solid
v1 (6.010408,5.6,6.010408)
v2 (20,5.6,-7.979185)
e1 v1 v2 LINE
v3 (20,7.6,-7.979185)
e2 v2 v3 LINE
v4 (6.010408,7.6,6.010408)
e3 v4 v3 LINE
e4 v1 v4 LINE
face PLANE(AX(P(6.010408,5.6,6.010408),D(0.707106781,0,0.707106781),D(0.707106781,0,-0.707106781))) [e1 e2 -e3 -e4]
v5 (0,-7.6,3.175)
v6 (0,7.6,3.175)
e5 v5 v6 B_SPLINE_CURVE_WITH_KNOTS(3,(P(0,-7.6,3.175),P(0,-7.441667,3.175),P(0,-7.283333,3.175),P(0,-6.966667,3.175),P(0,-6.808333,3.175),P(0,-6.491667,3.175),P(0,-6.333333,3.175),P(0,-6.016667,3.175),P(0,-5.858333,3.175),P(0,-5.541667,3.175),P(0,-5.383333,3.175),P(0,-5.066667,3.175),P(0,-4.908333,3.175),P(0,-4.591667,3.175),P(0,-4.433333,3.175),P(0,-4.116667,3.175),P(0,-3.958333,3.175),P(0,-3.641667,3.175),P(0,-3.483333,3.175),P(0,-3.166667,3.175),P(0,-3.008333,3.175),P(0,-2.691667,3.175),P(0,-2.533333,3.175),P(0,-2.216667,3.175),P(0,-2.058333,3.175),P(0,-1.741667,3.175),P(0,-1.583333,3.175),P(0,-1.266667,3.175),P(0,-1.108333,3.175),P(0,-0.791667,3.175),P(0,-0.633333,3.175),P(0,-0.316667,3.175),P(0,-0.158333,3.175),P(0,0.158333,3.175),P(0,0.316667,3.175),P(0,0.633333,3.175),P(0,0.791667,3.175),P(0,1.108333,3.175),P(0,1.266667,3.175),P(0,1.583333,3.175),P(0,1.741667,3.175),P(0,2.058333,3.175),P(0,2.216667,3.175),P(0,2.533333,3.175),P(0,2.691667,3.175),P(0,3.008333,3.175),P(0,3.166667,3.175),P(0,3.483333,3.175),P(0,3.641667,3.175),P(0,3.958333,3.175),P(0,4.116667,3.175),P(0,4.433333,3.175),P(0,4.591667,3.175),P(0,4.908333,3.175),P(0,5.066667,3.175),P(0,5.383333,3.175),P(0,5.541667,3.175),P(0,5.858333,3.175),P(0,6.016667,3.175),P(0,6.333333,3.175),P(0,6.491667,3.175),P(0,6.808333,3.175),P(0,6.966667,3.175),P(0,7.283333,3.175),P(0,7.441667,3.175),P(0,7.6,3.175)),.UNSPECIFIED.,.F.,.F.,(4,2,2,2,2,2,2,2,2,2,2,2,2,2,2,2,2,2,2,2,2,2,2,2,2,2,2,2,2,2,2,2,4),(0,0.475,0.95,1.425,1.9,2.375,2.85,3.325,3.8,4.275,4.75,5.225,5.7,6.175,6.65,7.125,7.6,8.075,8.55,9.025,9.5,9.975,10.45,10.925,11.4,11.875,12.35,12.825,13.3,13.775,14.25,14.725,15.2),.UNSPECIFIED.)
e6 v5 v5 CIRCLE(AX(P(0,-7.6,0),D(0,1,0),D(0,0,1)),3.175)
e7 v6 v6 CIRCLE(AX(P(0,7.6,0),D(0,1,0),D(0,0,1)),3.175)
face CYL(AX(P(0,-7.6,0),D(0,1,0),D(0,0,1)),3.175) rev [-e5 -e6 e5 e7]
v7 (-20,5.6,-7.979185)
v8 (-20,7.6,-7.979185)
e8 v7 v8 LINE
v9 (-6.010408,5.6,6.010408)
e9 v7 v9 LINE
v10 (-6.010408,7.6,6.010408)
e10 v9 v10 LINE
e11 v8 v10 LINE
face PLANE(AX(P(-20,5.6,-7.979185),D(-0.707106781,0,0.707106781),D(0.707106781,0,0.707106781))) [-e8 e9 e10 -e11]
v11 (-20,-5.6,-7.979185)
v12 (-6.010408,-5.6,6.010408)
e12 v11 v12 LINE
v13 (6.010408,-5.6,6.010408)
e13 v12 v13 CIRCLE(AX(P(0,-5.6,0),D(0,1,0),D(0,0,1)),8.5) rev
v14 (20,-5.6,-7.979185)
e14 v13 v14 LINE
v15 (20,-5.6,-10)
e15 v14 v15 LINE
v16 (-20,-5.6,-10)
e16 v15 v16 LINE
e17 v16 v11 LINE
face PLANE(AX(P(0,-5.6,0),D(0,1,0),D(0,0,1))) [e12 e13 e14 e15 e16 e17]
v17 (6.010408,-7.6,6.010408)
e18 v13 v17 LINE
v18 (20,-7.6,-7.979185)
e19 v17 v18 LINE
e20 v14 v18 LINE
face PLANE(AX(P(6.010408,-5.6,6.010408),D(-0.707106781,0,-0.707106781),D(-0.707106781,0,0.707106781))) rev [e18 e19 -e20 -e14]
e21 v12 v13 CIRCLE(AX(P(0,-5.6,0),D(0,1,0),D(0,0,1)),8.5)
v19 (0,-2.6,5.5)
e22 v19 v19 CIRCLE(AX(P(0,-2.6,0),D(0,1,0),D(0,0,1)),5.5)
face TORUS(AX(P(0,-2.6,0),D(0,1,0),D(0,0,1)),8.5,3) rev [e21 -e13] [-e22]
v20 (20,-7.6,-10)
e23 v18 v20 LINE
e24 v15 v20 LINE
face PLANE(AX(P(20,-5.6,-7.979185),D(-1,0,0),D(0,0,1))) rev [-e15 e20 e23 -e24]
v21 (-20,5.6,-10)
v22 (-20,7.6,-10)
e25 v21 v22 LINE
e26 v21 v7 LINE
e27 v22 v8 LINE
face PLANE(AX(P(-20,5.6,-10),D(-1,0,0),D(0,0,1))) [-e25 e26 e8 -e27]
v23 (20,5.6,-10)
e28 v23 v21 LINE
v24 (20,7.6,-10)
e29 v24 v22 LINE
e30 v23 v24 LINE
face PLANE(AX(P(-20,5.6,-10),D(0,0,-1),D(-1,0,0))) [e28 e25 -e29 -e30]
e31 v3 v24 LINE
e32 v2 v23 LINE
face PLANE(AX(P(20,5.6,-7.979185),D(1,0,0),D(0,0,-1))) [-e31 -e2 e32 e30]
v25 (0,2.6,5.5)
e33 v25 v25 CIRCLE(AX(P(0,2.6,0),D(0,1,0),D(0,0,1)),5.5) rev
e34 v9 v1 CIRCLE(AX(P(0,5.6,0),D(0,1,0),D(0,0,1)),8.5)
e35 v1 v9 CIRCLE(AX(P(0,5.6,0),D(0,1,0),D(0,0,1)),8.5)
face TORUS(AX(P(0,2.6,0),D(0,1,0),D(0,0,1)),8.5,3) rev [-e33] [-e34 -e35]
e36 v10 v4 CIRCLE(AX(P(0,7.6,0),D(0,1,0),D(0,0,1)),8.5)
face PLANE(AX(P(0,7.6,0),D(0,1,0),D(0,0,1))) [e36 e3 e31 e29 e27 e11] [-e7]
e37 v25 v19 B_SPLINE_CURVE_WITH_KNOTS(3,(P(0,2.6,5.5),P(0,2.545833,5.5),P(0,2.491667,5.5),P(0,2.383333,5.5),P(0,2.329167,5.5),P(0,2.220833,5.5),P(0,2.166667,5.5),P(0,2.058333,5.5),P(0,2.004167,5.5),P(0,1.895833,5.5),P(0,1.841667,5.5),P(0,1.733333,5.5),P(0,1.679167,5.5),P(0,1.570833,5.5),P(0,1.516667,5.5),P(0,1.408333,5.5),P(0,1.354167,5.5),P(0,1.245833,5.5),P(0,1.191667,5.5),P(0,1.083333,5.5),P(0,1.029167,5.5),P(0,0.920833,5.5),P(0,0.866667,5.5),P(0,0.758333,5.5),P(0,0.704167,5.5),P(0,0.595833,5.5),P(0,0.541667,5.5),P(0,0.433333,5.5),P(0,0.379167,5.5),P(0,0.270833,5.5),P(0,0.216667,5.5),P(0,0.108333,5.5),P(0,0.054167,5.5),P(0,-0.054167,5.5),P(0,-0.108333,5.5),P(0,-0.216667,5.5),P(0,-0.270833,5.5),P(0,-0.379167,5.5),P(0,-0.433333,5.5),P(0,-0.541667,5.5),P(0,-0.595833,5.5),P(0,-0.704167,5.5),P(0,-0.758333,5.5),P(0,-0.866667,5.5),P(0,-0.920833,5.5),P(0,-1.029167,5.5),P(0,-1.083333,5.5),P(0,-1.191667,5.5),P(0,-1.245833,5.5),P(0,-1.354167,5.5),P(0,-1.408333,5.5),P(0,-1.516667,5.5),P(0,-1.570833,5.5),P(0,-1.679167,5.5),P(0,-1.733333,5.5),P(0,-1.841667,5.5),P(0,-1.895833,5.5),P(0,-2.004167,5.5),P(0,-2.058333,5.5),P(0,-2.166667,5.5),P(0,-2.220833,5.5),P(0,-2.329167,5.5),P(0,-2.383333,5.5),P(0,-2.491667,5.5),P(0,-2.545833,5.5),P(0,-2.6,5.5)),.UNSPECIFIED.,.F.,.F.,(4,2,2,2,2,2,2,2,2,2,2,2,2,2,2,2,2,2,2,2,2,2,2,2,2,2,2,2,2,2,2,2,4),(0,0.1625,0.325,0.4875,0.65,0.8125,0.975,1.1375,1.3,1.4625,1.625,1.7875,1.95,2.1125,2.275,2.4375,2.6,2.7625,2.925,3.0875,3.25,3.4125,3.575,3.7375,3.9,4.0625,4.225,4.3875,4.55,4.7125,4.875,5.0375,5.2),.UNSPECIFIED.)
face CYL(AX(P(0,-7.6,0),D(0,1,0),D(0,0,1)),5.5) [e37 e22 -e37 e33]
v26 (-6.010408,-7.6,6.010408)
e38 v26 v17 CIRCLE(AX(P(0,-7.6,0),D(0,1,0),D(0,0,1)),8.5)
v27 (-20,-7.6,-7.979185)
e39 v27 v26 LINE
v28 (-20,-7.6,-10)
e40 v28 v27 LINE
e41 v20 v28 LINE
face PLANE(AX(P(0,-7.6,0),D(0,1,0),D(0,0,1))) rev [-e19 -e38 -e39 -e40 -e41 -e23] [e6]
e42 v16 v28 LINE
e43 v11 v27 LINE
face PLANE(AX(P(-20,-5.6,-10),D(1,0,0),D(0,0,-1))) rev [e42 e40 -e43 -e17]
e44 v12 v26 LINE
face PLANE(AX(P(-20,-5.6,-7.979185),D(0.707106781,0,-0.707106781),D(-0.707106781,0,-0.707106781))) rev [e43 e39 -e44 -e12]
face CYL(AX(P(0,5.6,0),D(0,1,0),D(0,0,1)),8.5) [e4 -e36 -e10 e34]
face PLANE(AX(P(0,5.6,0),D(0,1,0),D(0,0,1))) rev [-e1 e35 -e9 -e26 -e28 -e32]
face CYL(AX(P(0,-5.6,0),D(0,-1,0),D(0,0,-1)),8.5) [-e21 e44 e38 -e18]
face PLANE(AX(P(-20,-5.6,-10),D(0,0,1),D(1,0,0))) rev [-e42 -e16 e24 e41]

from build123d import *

# Parameters (mm, degrees)
BOSS_EXTRUDE1_DEPTH      = 7.6
BOSS_EXTRUDE1_DEPTH_BACK = 7.6
SKETCH1_R                = 5.5
SKETCH1_R_2              = 3.175
BOSS_EXTRUDE2_START      = 7.6
SKETCH2_R                = 5.5
BOSS_EXTRUDE2_DEPTH      = 2
BOSS_EXTRUDE3_START      = -5.6
SKETCH2_2_R              = 5.5
BOSS_EXTRUDE3_DEPTH      = 2


with BuildPart() as part:
    # Sketch1 → Boss-Extrude1 (new, two sides: drawn at the far end of the back side and taken through both)
    with BuildSketch(Plane(origin=(0, 0, 0), x_dir=(1, 0, 0), z_dir=(0, 1, 0)).offset(-BOSS_EXTRUDE1_DEPTH_BACK)):
        with Locations(Location((0, 0, 0), (0, 0, 270))):
            Circle(SKETCH1_R)
        with Locations(Location((0, 0, 0), (0, 0, 270))):
            Circle(SKETCH1_R_2, mode=Mode.SUBTRACT)
    extrude(amount=BOSS_EXTRUDE1_DEPTH + BOSS_EXTRUDE1_DEPTH_BACK)

    # Sketch2 → Boss-Extrude2 (add)
    with BuildSketch(Plane(origin=(0, 0, 0), x_dir=(1, 0, 0), z_dir=(0, 1, 0)).offset(BOSS_EXTRUDE2_START)):
        with BuildLine():
            Line((-20, 10), (20, 10))
            Line((20, 10), (20, 7.97918472))
            Line((20, 7.97918472), (6.01040764, -6.01040764))
            ThreePointArc((6.01040764, -6.01040764), (0, -8.5), (-6.01040764, -6.01040764))
            Line((-6.01040764, -6.01040764), (-20, 7.97918472))
            Line((-20, 7.97918472), (-20, 10))
        make_face()
        with Locations(Location((0, 0, 0), (0, 0, 270))):
            Circle(SKETCH2_R, mode=Mode.SUBTRACT)
    extrude(amount=-BOSS_EXTRUDE2_DEPTH)

    # Sketch2<2> → Boss-Extrude3 (add)
    with BuildSketch(Plane(origin=(0, 0, 0), x_dir=(1, 0, 0), z_dir=(0, 1, 0)).offset(BOSS_EXTRUDE3_START)):
        with BuildLine():
            Line((-20, 10), (20, 10))
            Line((20, 10), (20, 7.97918472))
            Line((20, 7.97918472), (6.01040764, -6.01040764))
            ThreePointArc((6.01040764, -6.01040764), (0, -8.5), (-6.01040764, -6.01040764))
            Line((-6.01040764, -6.01040764), (-20, 7.97918472))
            Line((-20, 7.97918472), (-20, 10))
        make_face()
        with Locations(Location((0, 0, 0), (0, 0, 270))):
            Circle(SKETCH2_2_R, mode=Mode.SUBTRACT)
    extrude(amount=-BOSS_EXTRUDE3_DEPTH)

    # Fillet1: read off the stored shape, not the designer's step
    # Fillet1 outline → Fillet1 (revolve)
    with BuildSketch(Plane.XY):
        with BuildLine():
            ThreePointArc((5.5, 2.6), (6.378679656, 4.721320344), (8.5, 5.6))
            Line((8.5, 5.6), (5.5, 5.6))
            Line((5.5, 5.6), (5.5, 2.6))
        make_face()
        with BuildLine():
            ThreePointArc((8.5, -5.6), (6.378679656, -4.721320344), (5.5, -2.6))
            Line((5.5, -2.6), (5.5, -5.6))
            Line((5.5, -5.6), (8.5, -5.6))
        make_face()
    revolve(axis=Axis((0, 0, 0), (0, 1, 0)))


solid = part.part
